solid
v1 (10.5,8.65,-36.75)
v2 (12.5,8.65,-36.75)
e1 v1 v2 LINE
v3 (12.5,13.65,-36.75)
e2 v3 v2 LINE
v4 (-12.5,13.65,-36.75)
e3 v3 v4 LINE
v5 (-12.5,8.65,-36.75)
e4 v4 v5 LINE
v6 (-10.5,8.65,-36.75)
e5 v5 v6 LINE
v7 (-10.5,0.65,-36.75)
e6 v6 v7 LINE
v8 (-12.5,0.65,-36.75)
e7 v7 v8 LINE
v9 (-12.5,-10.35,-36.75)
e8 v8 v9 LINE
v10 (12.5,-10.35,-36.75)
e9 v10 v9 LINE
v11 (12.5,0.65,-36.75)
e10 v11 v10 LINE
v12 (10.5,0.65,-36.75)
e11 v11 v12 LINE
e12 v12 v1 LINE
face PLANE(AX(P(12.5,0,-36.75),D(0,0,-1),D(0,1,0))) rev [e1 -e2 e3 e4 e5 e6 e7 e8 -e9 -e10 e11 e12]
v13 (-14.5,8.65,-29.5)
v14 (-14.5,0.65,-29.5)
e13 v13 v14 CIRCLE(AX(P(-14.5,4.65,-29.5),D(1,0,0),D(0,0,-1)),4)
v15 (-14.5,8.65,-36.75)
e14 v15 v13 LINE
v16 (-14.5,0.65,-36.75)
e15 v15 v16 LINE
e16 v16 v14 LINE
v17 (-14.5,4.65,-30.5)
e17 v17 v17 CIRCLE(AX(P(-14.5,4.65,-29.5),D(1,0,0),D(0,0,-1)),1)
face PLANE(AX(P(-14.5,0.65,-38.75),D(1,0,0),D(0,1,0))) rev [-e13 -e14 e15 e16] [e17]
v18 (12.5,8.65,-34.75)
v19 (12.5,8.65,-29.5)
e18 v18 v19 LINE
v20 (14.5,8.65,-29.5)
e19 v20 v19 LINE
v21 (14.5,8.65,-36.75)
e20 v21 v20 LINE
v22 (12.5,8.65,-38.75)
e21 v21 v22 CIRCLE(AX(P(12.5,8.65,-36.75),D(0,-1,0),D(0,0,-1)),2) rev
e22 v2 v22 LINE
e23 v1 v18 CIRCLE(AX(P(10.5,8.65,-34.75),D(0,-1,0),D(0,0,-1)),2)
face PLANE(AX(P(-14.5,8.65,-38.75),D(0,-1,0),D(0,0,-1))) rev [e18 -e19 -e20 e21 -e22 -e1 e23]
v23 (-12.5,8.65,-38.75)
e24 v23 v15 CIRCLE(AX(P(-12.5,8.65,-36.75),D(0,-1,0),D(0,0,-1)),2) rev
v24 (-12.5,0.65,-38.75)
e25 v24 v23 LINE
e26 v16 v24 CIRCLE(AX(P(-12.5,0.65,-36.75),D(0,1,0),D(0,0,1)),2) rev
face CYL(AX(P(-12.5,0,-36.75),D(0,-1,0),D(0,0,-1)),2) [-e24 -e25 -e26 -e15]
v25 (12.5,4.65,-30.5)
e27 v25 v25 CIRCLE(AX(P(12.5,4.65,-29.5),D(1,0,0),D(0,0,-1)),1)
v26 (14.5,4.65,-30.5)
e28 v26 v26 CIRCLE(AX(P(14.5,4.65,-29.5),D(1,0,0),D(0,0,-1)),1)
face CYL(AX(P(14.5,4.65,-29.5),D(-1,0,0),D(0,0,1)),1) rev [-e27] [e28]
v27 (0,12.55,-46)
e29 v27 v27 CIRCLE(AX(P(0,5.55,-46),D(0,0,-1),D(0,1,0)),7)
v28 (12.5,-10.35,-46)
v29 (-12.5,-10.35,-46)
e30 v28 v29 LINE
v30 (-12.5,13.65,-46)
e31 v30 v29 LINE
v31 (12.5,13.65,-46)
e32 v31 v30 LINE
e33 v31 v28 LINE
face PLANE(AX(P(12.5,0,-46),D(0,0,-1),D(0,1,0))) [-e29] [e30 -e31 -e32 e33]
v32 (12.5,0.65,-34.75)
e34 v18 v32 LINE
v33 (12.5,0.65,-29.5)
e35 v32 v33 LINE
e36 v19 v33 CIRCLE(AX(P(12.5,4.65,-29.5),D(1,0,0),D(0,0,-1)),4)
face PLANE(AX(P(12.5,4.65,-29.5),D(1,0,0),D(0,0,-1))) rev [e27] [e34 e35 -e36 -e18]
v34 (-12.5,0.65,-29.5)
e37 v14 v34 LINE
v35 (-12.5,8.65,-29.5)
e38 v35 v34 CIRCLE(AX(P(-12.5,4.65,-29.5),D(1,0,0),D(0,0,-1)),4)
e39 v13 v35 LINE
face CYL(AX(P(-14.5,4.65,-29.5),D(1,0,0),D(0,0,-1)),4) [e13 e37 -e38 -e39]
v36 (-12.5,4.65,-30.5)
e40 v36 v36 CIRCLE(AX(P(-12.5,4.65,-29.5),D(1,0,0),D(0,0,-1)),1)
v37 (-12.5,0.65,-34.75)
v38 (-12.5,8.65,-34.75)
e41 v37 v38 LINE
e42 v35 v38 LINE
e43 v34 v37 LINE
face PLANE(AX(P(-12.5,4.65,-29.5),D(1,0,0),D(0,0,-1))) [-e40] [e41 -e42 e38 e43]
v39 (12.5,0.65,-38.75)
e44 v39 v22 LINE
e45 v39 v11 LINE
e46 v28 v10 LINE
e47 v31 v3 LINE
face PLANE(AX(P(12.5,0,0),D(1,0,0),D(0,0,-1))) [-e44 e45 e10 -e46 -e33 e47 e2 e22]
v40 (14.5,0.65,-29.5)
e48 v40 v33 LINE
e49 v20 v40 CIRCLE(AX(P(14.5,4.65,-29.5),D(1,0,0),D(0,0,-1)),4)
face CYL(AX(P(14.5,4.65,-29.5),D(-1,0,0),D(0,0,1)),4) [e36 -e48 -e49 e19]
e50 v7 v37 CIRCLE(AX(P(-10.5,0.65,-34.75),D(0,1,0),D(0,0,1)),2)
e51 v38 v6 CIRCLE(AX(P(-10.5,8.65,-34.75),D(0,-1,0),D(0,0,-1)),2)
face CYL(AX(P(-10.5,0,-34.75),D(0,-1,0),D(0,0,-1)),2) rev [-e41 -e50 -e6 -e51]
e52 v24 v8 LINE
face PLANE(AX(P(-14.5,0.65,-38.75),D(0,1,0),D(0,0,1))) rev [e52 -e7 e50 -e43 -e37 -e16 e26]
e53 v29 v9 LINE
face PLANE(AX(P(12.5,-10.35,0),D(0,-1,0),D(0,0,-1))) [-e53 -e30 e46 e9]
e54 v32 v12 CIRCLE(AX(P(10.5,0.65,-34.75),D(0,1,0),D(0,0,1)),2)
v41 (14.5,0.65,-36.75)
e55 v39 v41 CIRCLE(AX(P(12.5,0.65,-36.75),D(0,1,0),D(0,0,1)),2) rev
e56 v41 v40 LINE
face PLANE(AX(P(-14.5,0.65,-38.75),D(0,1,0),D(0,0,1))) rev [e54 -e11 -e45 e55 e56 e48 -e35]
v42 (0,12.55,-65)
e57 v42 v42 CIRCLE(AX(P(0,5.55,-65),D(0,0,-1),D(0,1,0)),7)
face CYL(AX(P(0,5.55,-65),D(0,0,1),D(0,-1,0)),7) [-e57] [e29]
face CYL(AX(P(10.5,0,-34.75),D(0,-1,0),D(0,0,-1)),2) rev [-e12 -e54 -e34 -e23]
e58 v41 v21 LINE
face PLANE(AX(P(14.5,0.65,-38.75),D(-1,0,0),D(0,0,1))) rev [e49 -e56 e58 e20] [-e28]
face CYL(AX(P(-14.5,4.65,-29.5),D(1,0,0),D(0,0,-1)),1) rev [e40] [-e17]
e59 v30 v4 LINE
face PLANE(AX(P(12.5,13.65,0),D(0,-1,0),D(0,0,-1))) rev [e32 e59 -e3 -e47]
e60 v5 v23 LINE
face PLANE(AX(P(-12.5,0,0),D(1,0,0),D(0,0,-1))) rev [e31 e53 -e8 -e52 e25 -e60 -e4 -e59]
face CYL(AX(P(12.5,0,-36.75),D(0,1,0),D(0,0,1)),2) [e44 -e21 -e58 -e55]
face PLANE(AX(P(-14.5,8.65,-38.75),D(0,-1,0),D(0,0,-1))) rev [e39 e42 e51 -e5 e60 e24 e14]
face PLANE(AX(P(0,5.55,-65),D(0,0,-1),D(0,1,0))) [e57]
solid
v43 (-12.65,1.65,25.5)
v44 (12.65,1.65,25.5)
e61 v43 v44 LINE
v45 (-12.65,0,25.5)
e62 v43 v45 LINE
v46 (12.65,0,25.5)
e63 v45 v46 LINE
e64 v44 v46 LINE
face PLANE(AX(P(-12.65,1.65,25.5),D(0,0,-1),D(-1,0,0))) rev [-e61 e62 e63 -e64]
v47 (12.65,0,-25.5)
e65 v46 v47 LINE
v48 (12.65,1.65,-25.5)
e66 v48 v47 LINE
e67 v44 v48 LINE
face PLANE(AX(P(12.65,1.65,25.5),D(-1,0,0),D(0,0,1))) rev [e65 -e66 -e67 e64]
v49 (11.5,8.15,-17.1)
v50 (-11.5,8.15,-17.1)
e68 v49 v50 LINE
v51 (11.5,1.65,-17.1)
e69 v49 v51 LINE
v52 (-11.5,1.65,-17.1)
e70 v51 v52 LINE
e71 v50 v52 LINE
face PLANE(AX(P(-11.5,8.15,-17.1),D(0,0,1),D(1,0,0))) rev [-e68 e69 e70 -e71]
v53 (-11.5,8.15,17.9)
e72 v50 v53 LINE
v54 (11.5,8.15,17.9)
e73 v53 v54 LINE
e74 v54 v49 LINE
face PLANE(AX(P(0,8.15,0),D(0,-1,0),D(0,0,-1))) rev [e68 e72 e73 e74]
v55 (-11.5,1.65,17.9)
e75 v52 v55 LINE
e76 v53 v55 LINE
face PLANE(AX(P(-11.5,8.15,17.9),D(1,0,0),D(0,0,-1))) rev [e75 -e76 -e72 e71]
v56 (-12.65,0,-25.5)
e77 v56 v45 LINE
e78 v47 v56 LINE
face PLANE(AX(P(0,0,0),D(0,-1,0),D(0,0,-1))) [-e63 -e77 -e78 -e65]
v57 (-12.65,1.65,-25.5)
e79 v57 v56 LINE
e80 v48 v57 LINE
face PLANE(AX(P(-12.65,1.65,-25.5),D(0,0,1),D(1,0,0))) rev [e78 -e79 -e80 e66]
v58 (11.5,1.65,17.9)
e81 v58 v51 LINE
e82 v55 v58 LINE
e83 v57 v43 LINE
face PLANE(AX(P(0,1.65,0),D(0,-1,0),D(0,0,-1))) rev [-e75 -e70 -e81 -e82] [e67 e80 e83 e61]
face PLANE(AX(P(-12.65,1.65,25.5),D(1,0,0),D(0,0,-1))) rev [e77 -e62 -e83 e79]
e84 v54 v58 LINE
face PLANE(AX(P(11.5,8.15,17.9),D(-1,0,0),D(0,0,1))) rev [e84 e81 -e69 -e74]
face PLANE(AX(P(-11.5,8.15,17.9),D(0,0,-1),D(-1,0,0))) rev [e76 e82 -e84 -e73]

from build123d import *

# Parameters (mm, degrees)
SKETCH1_W           = 25.3
SKETCH1_H           = 51
BOSS_EXTRUDE1_DEPTH = 1.65
SKETCH2_W           = 23
SKETCH2_H           = 35
BOSS_EXTRUDE2_DEPTH = 6.5
BOSS_EXTRUDE3_DEPTH = 12.5
BOSS_EXTRUDE4_START = 12.5
SKETCH3_3_R         = 1
BOSS_EXTRUDE4_DEPTH = 2
BOSS_EXTRUDE5_START = -12.5
SKETCH3_4_R         = 1
BOSS_EXTRUDE5_DEPTH = 2
SKETCH5_W           = 29
SKETCH5_H           = 8
BOSS_EXTRUDE6_DEPTH = 2
FILLET1_R           = 2
SKETCH6_R           = 7
BOSS_EXTRUDE7_DEPTH = 19


with BuildPart() as part:
    # Sketch1 → Boss-Extrude1 (new body)
    with BuildSketch(Plane(origin=(0, 0, 0), x_dir=(1, 0, 0), z_dir=(0, 1, 0))):
        Rectangle(SKETCH1_W, SKETCH1_H)
    extrude(amount=BOSS_EXTRUDE1_DEPTH)

    # Sketch2 → Boss-Extrude2 (add)
    with BuildSketch(Plane(origin=(0, 1.65, 0), x_dir=(1, 0, 0), z_dir=(0, 1, 0))):
        with Locations((0, -0.4)):
            Rectangle(SKETCH2_W, SKETCH2_H)
    extrude(amount=BOSS_EXTRUDE2_DEPTH)


with BuildPart() as body_2:
    # Sketch3 → Boss-Extrude3 (new, symmetric)
    with BuildSketch(Plane(origin=(0, 0, 0), x_dir=(0, 0, -1), z_dir=(1, 0, 0))):
        Polygon((36.75, 13.65), (36.75, 8.65), (36.75, 0.65), (36.75, -10.35), (46, -10.35), (46, 13.65), align=None)
    extrude(amount=BOSS_EXTRUDE3_DEPTH, both=True)



with BuildPart() as body_3:
    # Sketch3<3> → Boss-Extrude4 (new body)
    with BuildSketch(Plane(origin=(0, 0, 0), x_dir=(0, 0, -1), z_dir=(1, 0, 0)).offset(BOSS_EXTRUDE4_START)):
        with BuildLine():
            Line((29.5, 8.65), (36.75, 8.65))
            Line((36.75, 8.65), (36.75, 0.65))
            Line((36.75, 0.65), (29.5, 0.65))
            ThreePointArc((29.5, 0.65), (25.5, 4.65), (29.5, 8.65))
        make_face()
        with Locations((29.5, 4.65)):
            Circle(SKETCH3_3_R, mode=Mode.SUBTRACT)
    extrude(amount=BOSS_EXTRUDE4_DEPTH)


with BuildPart() as body_4:
    # Sketch3<4> → Boss-Extrude5 (new body)
    with BuildSketch(Plane(origin=(0, 0, 0), x_dir=(0, 0, -1), z_dir=(1, 0, 0)).offset(BOSS_EXTRUDE5_START)):
        with BuildLine():
            Line((29.5, 8.65), (36.75, 8.65))
            Line((36.75, 8.65), (36.75, 0.65))
            Line((36.75, 0.65), (29.5, 0.65))
            ThreePointArc((29.5, 0.65), (25.5, 4.65), (29.5, 8.65))
        make_face()
        with Locations((29.5, 4.65)):
            Circle(SKETCH3_4_R, mode=Mode.SUBTRACT)
    extrude(amount=-BOSS_EXTRUDE5_DEPTH)


with BuildPart() as body_2_1:
    add(body_2.part)

    add(body_3.part)  # Boss-Extrude6 merges body 3

    add(body_4.part)  # Boss-Extrude6 merges body 4
    # Sketch5 → Boss-Extrude6 (add)
    with BuildSketch(Plane(origin=(0, 0, -36.75), x_dir=(1, 0, 0), z_dir=(0, 0, -1))):
        with Locations((0, -4.65)):
            Rectangle(SKETCH5_W, SKETCH5_H)
    extrude(amount=BOSS_EXTRUDE6_DEPTH)

    # Fillet1
    fillet1_edges = [body_2_1.edges().sort_by_distance(p)[0] for p in [
        (12.5, 4.65, -36.75),
        (-12.5, 4.65, -36.75),
    ]]
    fillet(fillet1_edges, radius=FILLET1_R)
    fillet1_2_edges = [body_2_1.edges().sort_by_distance(p)[0] for p in [
        (14.5, 4.65, -38.75),
        (-14.5, 4.65, -38.75),
    ]]
    fillet(fillet1_2_edges, radius=FILLET1_R - 0.0001)  # a hair under: the kernel refuses the full size

    # Sketch6 → Boss-Extrude7 (add)
    with BuildSketch(Plane(origin=(0, 0, -46), x_dir=(1, 0, 0), z_dir=(0, 0, -1))):
        with Locations(Location((0, -5.55, 0), (0, 0, 270))):
            Circle(SKETCH6_R)
    extrude(amount=BOSS_EXTRUDE7_DEPTH)


solid = Compound([part.part, body_2_1.part])
